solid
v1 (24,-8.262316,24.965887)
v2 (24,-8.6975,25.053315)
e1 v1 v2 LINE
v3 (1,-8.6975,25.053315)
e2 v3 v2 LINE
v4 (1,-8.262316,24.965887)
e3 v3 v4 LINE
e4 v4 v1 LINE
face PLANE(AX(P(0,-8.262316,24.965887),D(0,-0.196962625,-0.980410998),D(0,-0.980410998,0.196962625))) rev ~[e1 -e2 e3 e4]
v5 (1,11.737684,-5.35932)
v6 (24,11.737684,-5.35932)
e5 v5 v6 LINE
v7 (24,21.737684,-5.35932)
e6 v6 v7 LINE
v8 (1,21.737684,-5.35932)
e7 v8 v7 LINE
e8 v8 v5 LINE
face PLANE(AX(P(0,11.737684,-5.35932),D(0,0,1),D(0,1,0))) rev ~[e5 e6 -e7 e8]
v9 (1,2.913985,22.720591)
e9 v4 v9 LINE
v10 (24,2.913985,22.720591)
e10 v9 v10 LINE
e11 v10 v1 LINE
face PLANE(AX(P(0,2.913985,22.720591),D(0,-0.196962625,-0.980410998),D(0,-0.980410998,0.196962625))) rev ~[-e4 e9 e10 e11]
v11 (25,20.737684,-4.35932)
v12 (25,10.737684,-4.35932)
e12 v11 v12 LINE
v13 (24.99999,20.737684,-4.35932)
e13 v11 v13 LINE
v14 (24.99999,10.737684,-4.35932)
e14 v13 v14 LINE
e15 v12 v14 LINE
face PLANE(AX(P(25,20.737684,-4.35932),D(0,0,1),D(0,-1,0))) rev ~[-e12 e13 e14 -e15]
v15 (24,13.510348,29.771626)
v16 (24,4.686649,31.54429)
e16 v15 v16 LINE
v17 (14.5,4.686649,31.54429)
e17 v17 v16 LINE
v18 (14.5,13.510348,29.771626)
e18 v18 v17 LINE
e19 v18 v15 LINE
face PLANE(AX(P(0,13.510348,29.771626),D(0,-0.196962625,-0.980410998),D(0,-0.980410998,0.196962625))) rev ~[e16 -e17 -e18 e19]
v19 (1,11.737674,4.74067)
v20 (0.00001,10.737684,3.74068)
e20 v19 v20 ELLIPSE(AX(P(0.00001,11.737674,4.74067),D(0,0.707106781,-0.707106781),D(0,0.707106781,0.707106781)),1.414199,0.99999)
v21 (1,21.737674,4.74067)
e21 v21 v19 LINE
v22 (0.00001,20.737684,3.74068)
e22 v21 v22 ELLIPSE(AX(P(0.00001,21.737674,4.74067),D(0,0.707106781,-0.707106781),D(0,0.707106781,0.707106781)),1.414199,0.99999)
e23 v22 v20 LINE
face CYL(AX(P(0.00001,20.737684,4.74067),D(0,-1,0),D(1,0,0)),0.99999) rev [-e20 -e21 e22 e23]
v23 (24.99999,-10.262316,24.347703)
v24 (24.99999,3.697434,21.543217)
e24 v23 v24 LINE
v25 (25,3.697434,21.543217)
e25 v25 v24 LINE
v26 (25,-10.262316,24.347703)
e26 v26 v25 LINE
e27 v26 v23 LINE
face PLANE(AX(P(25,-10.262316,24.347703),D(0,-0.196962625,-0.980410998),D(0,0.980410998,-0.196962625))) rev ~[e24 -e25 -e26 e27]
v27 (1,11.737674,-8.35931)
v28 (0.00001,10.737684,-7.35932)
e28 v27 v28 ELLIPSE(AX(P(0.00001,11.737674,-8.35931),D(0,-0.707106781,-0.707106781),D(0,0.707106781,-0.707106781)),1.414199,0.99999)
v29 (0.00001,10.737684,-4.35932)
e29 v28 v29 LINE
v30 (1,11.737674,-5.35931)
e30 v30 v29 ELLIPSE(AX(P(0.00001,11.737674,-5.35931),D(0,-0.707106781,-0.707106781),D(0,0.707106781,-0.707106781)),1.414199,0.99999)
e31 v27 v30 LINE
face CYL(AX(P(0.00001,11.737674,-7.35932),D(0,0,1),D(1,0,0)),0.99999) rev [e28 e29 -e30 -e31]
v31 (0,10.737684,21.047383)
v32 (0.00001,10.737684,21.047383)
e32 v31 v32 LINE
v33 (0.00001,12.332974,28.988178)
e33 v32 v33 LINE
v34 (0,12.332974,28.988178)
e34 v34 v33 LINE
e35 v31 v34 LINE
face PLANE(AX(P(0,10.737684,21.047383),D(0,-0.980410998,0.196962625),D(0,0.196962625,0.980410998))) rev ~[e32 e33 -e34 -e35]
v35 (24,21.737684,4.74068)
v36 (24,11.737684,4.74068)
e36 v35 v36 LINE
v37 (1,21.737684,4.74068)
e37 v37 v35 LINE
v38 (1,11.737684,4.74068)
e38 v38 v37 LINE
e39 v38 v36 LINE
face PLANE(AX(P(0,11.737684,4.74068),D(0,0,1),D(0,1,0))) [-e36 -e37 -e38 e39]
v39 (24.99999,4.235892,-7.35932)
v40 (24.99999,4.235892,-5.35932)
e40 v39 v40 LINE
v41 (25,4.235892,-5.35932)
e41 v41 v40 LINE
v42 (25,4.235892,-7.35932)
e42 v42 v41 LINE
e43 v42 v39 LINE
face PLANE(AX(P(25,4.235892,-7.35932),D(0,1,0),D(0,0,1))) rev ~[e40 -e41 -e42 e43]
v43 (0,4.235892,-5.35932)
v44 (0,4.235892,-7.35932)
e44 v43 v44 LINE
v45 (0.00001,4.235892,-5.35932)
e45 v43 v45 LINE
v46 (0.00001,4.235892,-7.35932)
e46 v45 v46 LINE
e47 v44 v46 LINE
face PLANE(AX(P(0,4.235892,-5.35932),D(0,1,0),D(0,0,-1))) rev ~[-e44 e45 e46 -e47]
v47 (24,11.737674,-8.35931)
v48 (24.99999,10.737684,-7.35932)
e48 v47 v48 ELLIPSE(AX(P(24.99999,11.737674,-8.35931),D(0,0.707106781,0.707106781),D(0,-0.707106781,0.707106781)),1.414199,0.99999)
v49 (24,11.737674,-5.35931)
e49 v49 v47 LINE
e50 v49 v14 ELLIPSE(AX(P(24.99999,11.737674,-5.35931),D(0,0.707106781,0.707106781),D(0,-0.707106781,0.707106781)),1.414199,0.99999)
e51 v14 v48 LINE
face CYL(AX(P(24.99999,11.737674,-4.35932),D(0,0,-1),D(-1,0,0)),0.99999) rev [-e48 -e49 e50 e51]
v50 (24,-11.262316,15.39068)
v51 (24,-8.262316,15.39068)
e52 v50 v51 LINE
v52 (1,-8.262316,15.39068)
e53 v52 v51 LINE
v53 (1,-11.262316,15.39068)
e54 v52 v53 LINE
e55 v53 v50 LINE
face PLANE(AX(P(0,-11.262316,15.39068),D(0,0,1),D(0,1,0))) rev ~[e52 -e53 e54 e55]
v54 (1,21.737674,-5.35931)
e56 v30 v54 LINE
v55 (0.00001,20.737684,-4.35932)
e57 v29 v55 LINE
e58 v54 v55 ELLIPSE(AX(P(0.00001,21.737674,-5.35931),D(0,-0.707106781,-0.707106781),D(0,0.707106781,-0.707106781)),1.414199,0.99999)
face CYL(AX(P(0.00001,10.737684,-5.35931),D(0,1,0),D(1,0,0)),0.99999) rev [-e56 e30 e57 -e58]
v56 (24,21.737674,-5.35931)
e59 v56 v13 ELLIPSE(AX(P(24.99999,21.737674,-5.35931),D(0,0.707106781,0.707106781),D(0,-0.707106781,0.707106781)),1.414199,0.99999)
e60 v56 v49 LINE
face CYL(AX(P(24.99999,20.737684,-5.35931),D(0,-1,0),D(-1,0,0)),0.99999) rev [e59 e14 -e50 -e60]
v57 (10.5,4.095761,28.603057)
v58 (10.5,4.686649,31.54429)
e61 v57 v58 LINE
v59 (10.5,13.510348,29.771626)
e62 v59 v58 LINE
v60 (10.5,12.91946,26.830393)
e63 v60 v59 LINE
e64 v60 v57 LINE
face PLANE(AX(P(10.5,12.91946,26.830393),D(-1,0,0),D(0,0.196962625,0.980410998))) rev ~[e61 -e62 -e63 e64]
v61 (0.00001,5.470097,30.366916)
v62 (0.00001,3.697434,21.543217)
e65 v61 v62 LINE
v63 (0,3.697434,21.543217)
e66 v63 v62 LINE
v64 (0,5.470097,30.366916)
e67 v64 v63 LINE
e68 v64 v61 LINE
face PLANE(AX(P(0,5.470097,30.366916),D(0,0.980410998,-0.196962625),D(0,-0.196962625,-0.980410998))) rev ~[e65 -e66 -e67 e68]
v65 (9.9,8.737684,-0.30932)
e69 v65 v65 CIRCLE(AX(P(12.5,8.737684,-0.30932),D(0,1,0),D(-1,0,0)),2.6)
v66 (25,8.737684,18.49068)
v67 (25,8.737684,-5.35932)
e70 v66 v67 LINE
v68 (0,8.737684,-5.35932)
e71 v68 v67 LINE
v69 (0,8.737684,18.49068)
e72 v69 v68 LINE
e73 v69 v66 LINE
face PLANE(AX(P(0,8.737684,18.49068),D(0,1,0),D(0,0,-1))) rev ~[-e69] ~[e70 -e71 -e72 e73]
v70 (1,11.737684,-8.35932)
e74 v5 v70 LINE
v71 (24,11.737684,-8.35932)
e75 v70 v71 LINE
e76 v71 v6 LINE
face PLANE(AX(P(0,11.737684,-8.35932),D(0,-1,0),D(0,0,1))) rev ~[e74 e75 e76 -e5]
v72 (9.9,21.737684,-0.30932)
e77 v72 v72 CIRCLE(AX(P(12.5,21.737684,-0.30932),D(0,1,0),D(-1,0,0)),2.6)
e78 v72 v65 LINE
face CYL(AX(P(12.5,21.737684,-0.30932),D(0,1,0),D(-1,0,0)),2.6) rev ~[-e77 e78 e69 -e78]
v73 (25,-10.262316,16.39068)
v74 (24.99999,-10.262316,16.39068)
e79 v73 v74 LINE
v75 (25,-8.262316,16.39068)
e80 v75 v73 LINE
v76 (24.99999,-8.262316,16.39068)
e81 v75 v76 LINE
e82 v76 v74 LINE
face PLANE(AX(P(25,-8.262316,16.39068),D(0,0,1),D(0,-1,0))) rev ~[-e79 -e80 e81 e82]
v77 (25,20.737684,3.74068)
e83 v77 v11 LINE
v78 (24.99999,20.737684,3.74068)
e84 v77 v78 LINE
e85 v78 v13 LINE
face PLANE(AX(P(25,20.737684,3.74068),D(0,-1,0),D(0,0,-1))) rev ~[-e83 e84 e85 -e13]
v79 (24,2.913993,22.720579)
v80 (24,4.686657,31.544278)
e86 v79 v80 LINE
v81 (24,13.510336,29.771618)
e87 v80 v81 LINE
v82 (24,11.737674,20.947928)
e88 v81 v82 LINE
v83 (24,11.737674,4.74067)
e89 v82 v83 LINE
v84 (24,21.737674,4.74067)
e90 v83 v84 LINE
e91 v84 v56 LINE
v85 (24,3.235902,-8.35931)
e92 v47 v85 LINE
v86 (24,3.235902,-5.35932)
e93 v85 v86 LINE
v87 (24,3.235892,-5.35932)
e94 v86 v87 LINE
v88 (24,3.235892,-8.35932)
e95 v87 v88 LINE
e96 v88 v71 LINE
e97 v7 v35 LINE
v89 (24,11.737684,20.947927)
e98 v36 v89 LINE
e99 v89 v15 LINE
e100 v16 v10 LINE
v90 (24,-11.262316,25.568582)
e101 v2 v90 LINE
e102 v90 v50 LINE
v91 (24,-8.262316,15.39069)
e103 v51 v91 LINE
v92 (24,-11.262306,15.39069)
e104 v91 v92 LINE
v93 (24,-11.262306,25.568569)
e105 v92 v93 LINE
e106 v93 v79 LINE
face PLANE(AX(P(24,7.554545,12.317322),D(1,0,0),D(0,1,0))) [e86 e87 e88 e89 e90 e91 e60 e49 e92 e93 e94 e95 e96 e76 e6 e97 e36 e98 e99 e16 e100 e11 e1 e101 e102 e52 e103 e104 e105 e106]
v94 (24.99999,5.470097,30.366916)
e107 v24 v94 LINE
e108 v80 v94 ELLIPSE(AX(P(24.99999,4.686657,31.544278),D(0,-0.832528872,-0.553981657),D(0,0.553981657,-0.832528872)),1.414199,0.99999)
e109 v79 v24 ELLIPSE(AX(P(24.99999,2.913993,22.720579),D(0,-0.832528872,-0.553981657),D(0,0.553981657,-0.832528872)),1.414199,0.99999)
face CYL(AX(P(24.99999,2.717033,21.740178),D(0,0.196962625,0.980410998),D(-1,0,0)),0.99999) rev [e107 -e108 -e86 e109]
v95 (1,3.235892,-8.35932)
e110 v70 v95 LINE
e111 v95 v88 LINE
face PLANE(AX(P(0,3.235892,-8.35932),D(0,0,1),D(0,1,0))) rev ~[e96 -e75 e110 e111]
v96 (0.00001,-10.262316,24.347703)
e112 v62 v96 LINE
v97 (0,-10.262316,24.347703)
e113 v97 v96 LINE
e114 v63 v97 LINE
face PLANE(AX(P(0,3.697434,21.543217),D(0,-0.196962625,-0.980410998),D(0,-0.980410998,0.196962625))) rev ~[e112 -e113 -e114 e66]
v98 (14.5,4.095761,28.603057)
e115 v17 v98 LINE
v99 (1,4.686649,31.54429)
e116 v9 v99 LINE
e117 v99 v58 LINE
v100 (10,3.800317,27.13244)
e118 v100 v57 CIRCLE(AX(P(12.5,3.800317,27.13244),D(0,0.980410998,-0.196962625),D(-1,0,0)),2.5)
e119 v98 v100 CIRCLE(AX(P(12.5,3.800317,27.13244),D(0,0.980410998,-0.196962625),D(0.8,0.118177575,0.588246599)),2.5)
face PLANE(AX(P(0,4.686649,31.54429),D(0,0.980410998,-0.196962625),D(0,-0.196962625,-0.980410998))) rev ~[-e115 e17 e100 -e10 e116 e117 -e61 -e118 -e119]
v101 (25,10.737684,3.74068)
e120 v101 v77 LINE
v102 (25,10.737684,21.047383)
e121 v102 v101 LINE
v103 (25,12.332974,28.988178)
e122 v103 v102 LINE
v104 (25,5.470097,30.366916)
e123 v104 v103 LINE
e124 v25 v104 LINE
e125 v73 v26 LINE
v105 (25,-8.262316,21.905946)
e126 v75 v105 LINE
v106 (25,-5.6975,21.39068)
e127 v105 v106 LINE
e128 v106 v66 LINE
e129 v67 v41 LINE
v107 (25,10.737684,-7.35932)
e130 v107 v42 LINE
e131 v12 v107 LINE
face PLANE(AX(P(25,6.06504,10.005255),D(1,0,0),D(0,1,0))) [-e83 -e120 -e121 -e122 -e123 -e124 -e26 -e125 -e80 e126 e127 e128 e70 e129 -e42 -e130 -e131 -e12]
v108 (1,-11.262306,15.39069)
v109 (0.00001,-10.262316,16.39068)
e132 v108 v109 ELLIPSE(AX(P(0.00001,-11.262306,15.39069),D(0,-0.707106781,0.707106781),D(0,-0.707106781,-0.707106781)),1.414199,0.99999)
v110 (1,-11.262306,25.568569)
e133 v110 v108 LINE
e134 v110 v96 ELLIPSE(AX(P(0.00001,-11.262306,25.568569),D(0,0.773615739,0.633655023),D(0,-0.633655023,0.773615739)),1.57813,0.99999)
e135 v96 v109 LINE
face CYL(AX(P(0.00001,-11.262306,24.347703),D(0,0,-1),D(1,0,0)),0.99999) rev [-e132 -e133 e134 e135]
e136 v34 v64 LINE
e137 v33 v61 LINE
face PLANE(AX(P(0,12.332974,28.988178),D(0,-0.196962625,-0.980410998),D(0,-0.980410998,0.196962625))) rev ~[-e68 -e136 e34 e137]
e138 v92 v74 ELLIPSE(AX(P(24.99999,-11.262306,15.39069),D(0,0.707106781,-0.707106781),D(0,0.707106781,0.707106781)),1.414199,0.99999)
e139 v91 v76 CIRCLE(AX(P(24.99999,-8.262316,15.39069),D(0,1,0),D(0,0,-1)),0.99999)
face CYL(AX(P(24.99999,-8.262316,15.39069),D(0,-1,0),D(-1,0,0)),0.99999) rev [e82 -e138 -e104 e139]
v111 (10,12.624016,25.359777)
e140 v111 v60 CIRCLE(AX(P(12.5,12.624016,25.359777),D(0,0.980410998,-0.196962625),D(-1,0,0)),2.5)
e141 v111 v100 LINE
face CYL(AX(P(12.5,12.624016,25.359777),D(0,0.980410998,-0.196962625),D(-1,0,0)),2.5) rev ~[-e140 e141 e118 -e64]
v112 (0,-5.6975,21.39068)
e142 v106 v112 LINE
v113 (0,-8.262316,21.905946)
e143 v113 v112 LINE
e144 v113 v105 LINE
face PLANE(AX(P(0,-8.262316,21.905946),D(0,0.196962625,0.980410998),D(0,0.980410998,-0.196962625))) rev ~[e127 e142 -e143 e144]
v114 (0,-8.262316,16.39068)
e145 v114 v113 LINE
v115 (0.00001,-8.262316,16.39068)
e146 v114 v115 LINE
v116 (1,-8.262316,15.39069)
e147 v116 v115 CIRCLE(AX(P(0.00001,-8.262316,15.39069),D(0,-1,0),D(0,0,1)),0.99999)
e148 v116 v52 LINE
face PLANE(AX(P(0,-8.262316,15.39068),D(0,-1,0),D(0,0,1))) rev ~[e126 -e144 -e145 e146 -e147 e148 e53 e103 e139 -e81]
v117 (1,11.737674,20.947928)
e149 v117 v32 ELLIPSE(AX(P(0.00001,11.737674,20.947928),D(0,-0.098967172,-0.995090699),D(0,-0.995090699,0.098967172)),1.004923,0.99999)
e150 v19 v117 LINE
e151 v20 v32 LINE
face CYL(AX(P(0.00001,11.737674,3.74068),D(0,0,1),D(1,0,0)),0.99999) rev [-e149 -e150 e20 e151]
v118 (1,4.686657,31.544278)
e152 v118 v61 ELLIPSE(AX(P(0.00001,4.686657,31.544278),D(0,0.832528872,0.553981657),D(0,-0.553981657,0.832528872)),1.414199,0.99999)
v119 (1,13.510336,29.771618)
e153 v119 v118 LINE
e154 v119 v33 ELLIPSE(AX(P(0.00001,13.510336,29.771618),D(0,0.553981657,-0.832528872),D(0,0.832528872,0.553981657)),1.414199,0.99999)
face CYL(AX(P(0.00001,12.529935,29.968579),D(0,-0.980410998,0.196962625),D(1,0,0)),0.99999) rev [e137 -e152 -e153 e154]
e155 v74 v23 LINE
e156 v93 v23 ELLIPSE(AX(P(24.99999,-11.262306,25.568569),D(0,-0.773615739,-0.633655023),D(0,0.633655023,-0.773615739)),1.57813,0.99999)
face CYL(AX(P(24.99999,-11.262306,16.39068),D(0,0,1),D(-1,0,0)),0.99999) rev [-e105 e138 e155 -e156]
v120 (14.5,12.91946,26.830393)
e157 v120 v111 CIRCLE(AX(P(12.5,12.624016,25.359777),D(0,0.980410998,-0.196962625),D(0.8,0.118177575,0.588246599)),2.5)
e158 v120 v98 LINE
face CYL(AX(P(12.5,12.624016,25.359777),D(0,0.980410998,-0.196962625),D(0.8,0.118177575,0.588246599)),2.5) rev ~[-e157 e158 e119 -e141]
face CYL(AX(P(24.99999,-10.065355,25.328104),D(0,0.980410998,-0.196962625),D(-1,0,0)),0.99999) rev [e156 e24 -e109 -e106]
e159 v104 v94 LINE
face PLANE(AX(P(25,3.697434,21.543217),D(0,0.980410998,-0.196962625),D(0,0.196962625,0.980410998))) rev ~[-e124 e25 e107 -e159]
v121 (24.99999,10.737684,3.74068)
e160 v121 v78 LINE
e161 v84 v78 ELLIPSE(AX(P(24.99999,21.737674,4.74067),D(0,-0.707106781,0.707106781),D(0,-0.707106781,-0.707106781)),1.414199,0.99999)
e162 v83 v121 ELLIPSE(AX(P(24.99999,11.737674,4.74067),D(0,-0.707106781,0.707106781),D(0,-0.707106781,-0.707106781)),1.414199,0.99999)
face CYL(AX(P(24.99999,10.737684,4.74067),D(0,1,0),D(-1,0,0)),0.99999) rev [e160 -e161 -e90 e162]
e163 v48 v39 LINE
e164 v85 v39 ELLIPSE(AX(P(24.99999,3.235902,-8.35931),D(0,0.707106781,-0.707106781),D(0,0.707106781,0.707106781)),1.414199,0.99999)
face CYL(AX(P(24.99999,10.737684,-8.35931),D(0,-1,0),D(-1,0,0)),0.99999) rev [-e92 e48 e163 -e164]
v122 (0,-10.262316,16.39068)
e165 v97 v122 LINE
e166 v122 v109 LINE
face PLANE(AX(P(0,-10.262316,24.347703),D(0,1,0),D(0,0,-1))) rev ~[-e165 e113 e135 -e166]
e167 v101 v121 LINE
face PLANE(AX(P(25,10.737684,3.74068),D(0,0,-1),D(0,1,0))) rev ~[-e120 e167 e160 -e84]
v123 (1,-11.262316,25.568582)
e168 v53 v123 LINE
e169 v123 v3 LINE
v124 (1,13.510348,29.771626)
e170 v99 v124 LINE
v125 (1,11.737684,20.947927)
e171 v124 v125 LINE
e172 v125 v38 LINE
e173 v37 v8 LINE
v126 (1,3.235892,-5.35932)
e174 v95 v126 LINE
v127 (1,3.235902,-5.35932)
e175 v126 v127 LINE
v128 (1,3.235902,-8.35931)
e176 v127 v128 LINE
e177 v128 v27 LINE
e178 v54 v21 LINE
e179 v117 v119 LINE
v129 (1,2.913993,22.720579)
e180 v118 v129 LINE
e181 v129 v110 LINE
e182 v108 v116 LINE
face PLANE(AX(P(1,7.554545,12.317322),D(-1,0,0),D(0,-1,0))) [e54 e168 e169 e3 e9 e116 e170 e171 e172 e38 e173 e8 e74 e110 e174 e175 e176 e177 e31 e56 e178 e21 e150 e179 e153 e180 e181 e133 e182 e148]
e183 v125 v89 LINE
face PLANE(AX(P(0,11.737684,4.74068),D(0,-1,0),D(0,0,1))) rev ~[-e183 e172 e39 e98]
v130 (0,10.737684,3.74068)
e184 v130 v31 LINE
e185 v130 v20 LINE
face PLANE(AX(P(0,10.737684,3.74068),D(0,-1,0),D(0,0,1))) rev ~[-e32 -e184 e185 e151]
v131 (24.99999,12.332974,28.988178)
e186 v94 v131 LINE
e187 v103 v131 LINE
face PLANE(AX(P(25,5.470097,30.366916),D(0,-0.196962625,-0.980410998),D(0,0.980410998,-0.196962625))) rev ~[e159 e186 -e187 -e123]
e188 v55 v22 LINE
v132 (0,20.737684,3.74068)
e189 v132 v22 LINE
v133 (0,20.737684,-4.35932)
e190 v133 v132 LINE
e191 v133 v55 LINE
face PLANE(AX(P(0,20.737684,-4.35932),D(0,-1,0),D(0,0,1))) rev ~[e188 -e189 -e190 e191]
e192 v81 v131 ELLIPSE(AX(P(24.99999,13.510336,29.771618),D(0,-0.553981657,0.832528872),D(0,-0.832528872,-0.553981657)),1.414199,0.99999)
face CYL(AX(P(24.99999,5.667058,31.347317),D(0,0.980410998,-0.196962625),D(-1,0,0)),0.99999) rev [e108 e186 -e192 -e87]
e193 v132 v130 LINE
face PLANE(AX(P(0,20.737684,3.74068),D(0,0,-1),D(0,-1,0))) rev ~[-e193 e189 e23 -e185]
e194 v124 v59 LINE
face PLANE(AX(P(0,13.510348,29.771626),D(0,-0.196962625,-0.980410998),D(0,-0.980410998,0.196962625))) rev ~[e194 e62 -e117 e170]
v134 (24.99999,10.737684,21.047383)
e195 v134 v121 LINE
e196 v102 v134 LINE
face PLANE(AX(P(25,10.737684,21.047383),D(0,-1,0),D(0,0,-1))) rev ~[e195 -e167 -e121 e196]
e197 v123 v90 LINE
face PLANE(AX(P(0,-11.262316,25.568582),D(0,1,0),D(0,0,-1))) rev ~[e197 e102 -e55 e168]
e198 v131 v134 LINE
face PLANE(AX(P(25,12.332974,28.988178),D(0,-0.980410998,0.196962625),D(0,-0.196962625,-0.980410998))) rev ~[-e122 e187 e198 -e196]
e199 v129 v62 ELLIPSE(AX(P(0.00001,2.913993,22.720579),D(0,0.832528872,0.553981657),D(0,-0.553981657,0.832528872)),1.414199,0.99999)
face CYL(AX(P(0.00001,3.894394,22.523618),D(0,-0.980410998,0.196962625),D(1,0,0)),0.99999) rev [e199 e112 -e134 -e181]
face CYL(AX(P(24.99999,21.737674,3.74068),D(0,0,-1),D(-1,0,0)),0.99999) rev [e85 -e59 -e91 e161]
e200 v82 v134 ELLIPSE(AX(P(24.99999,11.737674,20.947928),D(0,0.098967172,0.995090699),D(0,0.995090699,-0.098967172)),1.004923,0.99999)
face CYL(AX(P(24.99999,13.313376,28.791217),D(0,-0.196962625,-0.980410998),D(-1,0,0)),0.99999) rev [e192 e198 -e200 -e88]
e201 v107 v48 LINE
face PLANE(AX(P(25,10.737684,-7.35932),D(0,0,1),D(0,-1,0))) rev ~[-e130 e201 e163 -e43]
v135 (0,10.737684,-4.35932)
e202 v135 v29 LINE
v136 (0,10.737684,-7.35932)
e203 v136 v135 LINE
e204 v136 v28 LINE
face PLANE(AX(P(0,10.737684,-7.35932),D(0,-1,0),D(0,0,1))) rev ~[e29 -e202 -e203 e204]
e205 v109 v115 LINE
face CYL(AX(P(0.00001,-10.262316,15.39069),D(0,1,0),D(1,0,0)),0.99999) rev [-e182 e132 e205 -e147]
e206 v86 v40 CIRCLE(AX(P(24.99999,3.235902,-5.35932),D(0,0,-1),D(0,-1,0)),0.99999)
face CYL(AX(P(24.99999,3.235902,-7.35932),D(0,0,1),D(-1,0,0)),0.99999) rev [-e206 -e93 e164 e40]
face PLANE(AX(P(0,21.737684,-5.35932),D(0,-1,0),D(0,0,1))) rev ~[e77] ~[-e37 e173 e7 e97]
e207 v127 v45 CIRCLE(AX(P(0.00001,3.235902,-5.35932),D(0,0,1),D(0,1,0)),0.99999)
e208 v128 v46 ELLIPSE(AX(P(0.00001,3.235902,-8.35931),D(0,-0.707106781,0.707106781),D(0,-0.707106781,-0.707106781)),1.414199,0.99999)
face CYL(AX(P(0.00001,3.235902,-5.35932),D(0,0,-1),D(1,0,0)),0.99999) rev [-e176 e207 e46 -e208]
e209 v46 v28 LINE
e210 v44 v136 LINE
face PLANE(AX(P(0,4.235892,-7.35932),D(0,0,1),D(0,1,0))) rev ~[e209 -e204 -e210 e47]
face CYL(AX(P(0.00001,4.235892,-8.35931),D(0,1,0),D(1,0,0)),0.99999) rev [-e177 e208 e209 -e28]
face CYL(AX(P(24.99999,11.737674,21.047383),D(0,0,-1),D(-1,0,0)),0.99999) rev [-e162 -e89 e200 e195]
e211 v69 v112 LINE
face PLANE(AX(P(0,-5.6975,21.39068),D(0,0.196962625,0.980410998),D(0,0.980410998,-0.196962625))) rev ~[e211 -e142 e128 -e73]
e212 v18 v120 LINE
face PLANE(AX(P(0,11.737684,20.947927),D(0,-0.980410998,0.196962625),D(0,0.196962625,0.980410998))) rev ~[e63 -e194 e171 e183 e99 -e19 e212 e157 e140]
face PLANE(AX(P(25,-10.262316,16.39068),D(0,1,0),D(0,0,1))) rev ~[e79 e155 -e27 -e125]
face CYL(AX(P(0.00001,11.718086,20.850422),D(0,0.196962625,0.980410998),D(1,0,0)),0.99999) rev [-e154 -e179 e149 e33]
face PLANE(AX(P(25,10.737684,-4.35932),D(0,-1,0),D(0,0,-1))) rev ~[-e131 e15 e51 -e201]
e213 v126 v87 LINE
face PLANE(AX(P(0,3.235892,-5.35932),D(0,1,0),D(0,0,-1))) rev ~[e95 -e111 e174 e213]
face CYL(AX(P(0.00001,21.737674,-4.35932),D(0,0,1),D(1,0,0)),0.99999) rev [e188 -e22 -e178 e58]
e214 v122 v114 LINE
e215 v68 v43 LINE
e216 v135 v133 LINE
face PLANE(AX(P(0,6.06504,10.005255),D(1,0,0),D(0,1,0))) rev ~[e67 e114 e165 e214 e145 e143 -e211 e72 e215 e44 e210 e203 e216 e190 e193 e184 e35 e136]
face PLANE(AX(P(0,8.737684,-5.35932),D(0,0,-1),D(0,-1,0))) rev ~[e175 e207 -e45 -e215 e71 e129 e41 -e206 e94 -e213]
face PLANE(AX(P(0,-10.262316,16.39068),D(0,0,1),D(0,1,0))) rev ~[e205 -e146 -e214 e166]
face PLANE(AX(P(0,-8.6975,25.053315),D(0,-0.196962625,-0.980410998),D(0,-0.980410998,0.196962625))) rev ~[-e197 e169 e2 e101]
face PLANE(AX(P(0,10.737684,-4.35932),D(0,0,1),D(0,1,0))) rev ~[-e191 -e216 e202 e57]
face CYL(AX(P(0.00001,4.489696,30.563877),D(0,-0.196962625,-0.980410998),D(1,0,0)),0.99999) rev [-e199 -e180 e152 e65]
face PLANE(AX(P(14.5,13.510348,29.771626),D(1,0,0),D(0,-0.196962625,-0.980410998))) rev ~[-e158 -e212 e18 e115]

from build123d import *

# Parameters (mm, degrees)
F0_W      = 10
F0_H      = 10.1
F1_DEPTH  = 25
F3_DEPTH  = 24.6375403377
F4_R      = 2.6
F5_DEPTH  = 33.001
F7_DEPTH  = 1
F9_DEPTH  = 1
F11_DEPTH = 1
F12_R     = 0.99999
F13_R     = 0.99999


# Not quite as in the source:
# - a fillet or chamfer is up to 0.001 mm smaller than in the source, because OpenCascade refuses the exact size


with BuildPart() as f1:
    # F0 (on Right) → F1 (new body)
    with BuildSketch(Plane.YZ):
        Polygon((8.7376843859, -5.3593200147), (3.235891927, -5.3593200147), (3.235891927, -8.3593200147), (8.7376843859, -8.3593200147), (11.7376843859, -8.3593200147), (11.7376843859, -5.3593200147), (11.7376843859, 4.7406799853), (11.7376843859, 20.9479271312), (2.9139854062, 22.7205907531), (-8.2623156141, 24.9658874581), (-8.2623156141, 21.9059462631), (-5.6975004546, 21.3906799853), (8.7376843859, 18.4906799853), align=None)
        Polygon((-8.2623156141, 15.3906799853), (-8.2623156141, 21.9059462631), (-8.2623156141, 24.9658874581), (-8.6975004546, 25.0533152293), (-11.2623156141, 25.5685815071), (-11.2623156141, 15.3906799853), (-8.6975004546, 15.3906799853), align=None)
        with Locations((16.7376843859, -0.3093200147)):
            Rectangle(F0_W, F0_H)
        Polygon((4.6866490281, 31.5442897327), (2.9139854062, 22.7205907531), (11.7376843859, 20.9479271312), (13.5103480077, 29.7716261109), align=None)
    extrude(amount=F1_DEPTH)

    # F2 (on face) → F3 (cut, through all)
    with BuildSketch(Plane(origin=(0, 7.2371941298, -1.4539379446), x_dir=(-1, 0, 0), z_dir=(0, 0.9804109977, -0.1969626246))):
        with BuildLine():
            ThreePointArc((-14.5, 28.8494632633), (-13.290569415, 24.9777550181), (-10, 27.3494632633))
            ThreePointArc((-10, 27.3494632633), (-10.1282917549, 28.1400326783), (-10.5, 28.8494632633))
            ThreePointArc((-10.5, 28.8494632633), (-12.5, 29.8494632633), (-14.5, 28.8494632633))
        make_face()
        with BuildLine():
            ThreePointArc((-14.5, 28.8494632633), (-12.5, 29.8494632633), (-10.5, 28.8494632633))
            Line((-10.5, 28.8494632633), (-10.5, 31.8494632633))
            Line((-10.5, 31.8494632633), (-12.5, 31.8494632633))
            Line((-12.5, 31.8494632633), (-14.5, 31.8494632633))
            Line((-14.5, 31.8494632633), (-14.5, 28.8494632633))
        make_face()
    extrude(amount=-F3_DEPTH, mode=Mode.SUBTRACT)

    # F4 (on face) → F5 (cut, through all)
    with BuildSketch(Plane(origin=(0, 21.7376843859, 0), x_dir=(-1, 0, 0), z_dir=(0, 1, 0))):
        with Locations((-12.5, -0.3093200147)):
            Circle(F4_R)
    extrude(amount=-F5_DEPTH, mode=Mode.SUBTRACT)

    # F6 (on face) → F7 (cut)
    with BuildSketch(Plane(origin=(0, 0, 0), x_dir=(0, -1, 0), z_dir=(-1, 0, 0))):
        Polygon((0.6576159399, 20.3781771837), (8.2623156141, 15.3906799853), (8.2623156141, 21.9059462631), align=None)
    extrude(amount=-F7_DEPTH, mode=Mode.SUBTRACT)

    # F8 (on face) → F9 (cut)
    with BuildSketch(Plane.YZ.offset(25)):
        Polygon((-11.2623156141, 15.3906799853), (-8.2623156141, 15.3906799853), (-8.2623156141, 16.3906799853), (-10.2623156141, 16.3906799853), (-10.2623156141, 24.3477030924), (3.6974337793, 21.5432171307), (5.4700974012, 30.3669161103), (12.3329743853, 28.9881777378), (10.7376843859, 21.0473825599), (10.7376843859, 3.7406799853), (20.7376843859, 3.7406799853), (20.7376843859, -4.3593200147), (10.7376843859, -4.3593200147), (10.7376843859, -7.3593200147), (4.235891927, -7.3593200147), (4.235891927, -5.3593200147), (3.235891927, -5.3593200147), (3.235891927, -8.3593200147), (11.7376843859, -8.3593200147), (11.7376843859, -5.3593200147), (21.7376843859, -5.3593200147), (21.7376843859, 4.7406799853), (11.7376843859, 4.7406799853), (11.7376843859, 20.9479271312), (13.5103480077, 29.7716261109), (4.6866490281, 31.5442897327), (2.9139854062, 22.7205907531), (-11.2623156141, 25.5685815071), align=None)
    extrude(amount=-F9_DEPTH, mode=Mode.SUBTRACT)

    # F10 (on face) → F11 (cut)
    with BuildSketch(Plane(origin=(0, 0, 0), x_dir=(0, -1, 0), z_dir=(-1, 0, 0))):
        Polygon((8.2623156141, 16.3906799853), (8.2623156141, 15.3906799853), (11.2623156141, 15.3906799853), (11.2623156141, 25.5685815071), (-2.9139854062, 22.7205907531), (-4.6866490281, 31.5442897327), (-13.5103480077, 29.7716261109), (-11.7376843859, 20.9479271312), (-11.7376843859, 4.7406799853), (-21.7376843859, 4.7406799853), (-21.7376843859, -5.3593200147), (-11.7376843859, -5.3593200147), (-11.7376843859, -8.3593200147), (-3.235891927, -8.3593200147), (-3.235891927, -5.3593200147), (-4.235891927, -5.3593200147), (-4.235891927, -7.3593200147), (-10.7376843859, -7.3593200147), (-10.7376843859, -4.3593200147), (-20.7376843859, -4.3593200147), (-20.7376843859, 3.7406799853), (-10.7376843859, 3.7406799853), (-10.7376843859, 21.0473825599), (-12.3329743853, 28.9881777378), (-5.4700974012, 30.3669161103), (-3.6974337793, 21.5432171307), (10.2623156141, 24.3477030924), (10.2623156141, 16.3906799853), align=None)
    extrude(amount=-F11_DEPTH, mode=Mode.SUBTRACT)

    # F12 (radius 1 in the source; OpenCascade refuses exactly that, so slightly less here)
    f12_edges = [f1.edges().sort_by_distance(p)[0] for p in [
        (24, 4.235892, -6.35932),
        (24, 7.486788, -7.35932),
        (24, 15.737684, -4.35932),
        (24, 10.737684, -5.85932),
        (24, 20.737684, -0.30932),
        (24, 10.737684, 12.394031),
        (24, 15.737684, 3.74068),
        (24, 11.535329, 25.01778),
        (24, 8.901536, 29.677547),
        (24, -3.282441, 22.94546),
        (24, 4.583766, 25.955067),
        (24, -10.262316, 20.369192),
        (24, -9.262316, 16.39068),
    ]]
    fillet(f12_edges, radius=F12_R)

    # F13 (radius 1 in the source; OpenCascade refuses exactly that, so slightly less here)
    f13_edges = [f1.edges().sort_by_distance(p)[0] for p in [
        (1, 4.235892, -6.35932),
        (1, 7.486788, -7.35932),
        (1, 15.737684, -4.35932),
        (1, 10.737684, -5.85932),
        (1, 20.737684, -0.30932),
        (1, 10.737684, 12.394031),
        (1, 15.737684, 3.74068),
        (1, 11.535329, 25.01778),
        (1, 8.901536, 29.677547),
        (1, -3.282441, 22.94546),
        (1, 4.583766, 25.955067),
        (1, -10.262316, 20.369192),
        (1, -9.262316, 16.39068),
    ]]
    fillet(f13_edges, radius=F13_R)


solid = f1.part
